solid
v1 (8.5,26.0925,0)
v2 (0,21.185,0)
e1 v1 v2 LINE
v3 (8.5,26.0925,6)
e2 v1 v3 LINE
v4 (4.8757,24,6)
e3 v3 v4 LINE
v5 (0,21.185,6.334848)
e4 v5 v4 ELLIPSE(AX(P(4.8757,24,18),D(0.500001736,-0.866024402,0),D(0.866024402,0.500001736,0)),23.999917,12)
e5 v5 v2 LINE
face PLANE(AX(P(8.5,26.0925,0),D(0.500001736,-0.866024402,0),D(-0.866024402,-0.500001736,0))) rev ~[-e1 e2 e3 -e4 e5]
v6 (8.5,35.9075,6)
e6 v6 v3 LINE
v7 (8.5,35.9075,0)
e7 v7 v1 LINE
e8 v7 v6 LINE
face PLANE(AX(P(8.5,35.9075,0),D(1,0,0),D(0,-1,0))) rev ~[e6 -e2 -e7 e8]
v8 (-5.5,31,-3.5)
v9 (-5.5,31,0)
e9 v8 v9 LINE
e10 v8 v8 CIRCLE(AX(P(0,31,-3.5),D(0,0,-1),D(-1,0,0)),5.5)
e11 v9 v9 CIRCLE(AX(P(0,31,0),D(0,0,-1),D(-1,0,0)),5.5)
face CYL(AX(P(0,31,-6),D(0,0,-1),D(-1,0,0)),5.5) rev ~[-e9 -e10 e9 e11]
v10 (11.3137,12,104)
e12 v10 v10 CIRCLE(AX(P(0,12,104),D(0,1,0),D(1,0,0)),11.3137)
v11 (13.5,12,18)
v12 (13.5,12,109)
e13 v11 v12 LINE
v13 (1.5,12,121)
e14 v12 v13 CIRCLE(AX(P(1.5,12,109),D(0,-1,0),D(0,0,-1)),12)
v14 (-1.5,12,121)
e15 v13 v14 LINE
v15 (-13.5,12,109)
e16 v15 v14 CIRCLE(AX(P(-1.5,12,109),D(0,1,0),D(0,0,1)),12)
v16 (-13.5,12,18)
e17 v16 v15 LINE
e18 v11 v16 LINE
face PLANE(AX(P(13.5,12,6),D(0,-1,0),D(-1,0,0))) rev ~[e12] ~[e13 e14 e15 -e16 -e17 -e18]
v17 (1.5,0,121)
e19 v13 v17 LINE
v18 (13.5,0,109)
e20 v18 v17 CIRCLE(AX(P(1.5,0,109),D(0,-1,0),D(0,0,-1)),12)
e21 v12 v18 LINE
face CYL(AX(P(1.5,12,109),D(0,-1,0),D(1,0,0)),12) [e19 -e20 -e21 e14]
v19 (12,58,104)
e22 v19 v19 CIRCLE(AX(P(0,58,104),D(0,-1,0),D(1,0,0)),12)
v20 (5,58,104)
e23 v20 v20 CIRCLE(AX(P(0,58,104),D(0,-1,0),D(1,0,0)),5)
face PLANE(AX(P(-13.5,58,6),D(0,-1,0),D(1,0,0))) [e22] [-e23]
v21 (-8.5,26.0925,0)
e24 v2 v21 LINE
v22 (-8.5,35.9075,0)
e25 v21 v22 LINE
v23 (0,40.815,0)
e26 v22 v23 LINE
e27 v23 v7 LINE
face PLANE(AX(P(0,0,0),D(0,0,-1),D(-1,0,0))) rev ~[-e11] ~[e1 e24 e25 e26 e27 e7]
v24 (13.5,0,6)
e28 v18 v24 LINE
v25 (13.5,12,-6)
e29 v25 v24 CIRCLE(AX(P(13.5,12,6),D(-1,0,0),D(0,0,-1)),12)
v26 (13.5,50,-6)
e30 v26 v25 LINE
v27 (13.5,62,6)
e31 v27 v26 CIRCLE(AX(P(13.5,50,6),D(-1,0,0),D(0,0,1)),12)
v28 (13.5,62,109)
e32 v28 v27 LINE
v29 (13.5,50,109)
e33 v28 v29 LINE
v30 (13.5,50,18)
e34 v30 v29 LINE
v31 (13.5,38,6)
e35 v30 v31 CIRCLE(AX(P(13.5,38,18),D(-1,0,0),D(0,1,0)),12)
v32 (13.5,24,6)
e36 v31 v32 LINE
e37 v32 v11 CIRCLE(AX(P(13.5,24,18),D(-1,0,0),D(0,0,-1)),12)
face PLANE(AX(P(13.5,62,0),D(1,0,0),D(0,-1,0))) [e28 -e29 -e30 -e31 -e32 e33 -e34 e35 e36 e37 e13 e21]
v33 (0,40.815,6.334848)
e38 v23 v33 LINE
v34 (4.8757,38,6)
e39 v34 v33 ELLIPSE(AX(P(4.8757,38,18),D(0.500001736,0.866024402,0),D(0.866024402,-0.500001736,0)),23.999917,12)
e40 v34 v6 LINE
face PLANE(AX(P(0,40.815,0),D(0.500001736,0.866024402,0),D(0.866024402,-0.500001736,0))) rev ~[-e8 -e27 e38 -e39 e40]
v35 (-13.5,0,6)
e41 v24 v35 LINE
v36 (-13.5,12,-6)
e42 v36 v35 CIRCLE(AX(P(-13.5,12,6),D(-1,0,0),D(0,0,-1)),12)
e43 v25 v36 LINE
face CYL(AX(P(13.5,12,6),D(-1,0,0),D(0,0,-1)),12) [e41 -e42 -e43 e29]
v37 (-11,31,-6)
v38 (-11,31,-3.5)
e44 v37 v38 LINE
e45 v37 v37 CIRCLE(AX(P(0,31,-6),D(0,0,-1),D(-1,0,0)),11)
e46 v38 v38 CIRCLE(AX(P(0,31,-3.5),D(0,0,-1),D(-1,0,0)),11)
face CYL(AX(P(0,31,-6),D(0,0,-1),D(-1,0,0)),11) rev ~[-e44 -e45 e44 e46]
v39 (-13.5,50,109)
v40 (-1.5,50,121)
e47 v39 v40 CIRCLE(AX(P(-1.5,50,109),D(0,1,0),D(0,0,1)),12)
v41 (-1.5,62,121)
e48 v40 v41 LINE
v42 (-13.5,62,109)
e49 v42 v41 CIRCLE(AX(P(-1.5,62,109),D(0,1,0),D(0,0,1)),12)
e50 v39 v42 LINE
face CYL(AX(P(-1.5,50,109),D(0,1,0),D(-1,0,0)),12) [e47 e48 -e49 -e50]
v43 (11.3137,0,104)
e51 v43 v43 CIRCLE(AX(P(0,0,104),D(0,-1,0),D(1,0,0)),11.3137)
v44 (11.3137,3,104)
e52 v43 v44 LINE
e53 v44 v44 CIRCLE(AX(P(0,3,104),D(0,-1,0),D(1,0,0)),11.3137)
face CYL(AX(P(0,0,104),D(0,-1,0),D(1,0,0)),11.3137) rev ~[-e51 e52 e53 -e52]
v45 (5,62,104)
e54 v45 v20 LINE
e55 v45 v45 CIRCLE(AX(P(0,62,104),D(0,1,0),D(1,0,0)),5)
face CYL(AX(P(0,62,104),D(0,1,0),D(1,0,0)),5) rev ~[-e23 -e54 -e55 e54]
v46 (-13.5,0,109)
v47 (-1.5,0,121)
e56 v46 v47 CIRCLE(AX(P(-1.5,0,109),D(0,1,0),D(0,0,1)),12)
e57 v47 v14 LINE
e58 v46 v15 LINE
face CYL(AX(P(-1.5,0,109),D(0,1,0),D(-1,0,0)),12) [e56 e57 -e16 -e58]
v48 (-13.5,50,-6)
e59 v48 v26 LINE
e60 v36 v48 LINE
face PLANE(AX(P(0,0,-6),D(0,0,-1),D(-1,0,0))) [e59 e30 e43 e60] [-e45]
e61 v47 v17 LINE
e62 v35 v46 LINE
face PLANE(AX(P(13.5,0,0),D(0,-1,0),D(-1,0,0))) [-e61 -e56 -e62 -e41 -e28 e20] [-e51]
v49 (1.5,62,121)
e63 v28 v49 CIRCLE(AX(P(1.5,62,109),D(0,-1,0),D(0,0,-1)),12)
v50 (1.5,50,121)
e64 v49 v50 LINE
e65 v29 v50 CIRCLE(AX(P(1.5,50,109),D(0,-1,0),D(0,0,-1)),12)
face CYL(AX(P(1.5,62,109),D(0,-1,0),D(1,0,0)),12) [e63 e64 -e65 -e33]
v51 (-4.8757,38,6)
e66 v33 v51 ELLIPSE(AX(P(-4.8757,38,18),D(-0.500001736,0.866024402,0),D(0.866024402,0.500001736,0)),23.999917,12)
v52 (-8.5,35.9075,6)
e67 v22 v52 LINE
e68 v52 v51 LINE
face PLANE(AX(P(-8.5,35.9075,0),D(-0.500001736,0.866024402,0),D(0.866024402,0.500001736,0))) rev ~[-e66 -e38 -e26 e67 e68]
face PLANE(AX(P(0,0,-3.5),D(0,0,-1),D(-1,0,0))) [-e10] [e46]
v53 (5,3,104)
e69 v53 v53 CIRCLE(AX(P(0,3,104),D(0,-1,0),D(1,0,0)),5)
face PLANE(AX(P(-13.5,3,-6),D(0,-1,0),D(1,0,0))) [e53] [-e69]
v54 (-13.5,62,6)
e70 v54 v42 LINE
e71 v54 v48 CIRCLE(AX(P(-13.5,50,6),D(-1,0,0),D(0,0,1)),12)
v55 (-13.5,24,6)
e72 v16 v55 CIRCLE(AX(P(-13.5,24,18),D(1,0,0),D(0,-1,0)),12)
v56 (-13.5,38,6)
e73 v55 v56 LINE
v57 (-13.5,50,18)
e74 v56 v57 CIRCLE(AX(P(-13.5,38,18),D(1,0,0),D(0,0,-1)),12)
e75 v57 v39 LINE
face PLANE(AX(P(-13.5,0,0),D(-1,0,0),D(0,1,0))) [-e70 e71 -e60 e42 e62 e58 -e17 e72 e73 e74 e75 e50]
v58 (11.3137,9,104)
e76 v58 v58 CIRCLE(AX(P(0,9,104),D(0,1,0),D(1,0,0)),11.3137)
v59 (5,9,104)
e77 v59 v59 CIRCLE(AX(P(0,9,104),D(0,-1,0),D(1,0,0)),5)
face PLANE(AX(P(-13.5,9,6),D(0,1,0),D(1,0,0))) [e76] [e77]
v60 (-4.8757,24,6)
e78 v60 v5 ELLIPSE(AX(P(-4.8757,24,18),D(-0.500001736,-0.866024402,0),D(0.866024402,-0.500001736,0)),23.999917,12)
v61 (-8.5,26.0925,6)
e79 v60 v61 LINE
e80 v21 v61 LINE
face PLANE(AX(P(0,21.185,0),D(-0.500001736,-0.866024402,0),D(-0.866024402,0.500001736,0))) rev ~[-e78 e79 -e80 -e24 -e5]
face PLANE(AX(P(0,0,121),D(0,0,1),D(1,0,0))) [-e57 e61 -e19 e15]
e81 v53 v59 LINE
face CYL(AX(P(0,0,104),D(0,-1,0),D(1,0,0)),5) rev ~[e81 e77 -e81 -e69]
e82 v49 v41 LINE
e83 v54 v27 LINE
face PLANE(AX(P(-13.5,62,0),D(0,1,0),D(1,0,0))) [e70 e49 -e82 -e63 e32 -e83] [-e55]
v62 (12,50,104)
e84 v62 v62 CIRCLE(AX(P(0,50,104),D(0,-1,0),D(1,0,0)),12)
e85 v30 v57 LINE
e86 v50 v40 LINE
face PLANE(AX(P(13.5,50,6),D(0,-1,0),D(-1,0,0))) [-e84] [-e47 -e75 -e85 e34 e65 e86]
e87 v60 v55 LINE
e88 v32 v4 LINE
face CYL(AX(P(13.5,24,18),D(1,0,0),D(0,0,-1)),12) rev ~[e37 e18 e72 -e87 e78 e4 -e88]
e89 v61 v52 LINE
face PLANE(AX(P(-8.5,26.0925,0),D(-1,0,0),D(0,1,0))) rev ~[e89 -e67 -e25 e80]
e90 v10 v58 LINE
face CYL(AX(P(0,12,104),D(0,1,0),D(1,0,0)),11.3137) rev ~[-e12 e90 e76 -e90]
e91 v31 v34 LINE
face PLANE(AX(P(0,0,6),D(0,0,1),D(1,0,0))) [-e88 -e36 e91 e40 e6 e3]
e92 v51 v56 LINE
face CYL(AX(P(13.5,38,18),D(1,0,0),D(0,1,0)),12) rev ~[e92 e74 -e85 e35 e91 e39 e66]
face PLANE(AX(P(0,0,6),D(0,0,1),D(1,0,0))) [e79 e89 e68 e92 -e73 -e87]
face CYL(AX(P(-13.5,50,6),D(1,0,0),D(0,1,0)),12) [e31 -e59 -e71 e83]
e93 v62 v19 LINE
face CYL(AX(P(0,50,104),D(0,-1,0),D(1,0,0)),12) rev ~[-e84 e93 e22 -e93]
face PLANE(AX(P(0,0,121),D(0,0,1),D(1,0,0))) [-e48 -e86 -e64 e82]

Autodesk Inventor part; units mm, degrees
ref_plane "YZ Plane" through (0, 0, 0) normal (1, 0, 0) x (0, 1, 0)
ref_plane "XZ Plane" through (0, 0, 0) normal (0, 1, 0) x (-1, 0, 0)
ref_plane "XY Plane" through (0, 0, 0) normal (0, 0, 1) x (1, 0, 0)
sketch "Boceto1" plane through (0, 0, 0) normal (0, 0, 1) x (1, 0, 0)
  line L0 (-13.5, 62) -> (13.5, 62)
  line L1 (13.5, 62) -> (13.5, 0)
  line L2 (13.5, 0) -> (-13.5, 0)
  line L3 (-13.5, 0) -> (-13.5, 62)
  line L4 (0, 0) -> (0, 62) construction
  line L5 (0, 40.815) -> (8.5, 35.9075)
  line L6 (8.5, 35.9075) -> (8.5, 26.0925)
  line L7 (8.5, 26.0925) -> (0, 21.185)
  line L8 (0, 21.185) -> (-8.5, 26.0925)
  line L9 (-8.5, 26.0925) -> (-8.5, 35.9075)
  line L10 (-8.5, 35.9075) -> (0, 40.815)
  line L11 (-8.5, 35.9075) -> (-13.5, 35.9075) construction
  line L12 (8.5, 35.9075) -> (13.5, 35.9075) construction
  point P0 (0, 31)
  dimension "d20" = 17
  dimension "d21" = 5
  dimension "d22" = 27
  dimension "d23" = 62
extrude "Extrusión1" add sketch "Boceto1" along normal blind 6
sketch "Boceto2" plane through (0, 0, 0) normal (0, 0, -1) x (-1, 0, 0)
  line L0 (-8.5, 26.0925) -> (-8.5, 35.9075) projected
  line L1 (-8.5, 35.9075) -> (0, 40.815) projected
  line L2 (0, 40.815) -> (8.5, 35.9075) projected
  line L3 (8.5, 35.9075) -> (8.5, 26.0925) projected
  line L4 (8.5, 26.0925) -> (0, 21.185) projected
  line L5 (0, 21.185) -> (-8.5, 26.0925) projected
  line L6 (13.5, 62) -> (-13.5, 62) projected
  line L7 (-13.5, 62) -> (-13.5, 0) projected
  line L8 (-13.5, 0) -> (13.5, 0) projected
  line L9 (13.5, 0) -> (13.5, 62) projected
  point P0 (0, 0)
extrude "Extrusión2" add sketch "Boceto2" along normal blind 6 contours L0 L1 L2 L3 L4 L5 | L9 L8 L7 L6
sketch "Boceto3" plane through (0, 0, -6) normal (0, 0, -1) x (-1, 0, 0)
  line L0 (0, 0) -> (0, 62) construction
  line L1 (-13.5, 62) -> (13.5, 62) projected
  circle A0 centre (0, 31) radius 5.5
  dimension "d18" = 11
extrude "Extrusión3" cut sketch "Boceto3" against normal up to next
sketch "Boceto5" plane through (0, 0, 6) normal (0, 0, 1) x (1, 0, 0)
  line L0 (-13.5, 0) -> (-13.5, 62) projected
  line L1 (13.5, 62) -> (13.5, 0) projected
  line L2 (-13.5, 0) -> (13.5, 0)
  line L3 (13.5, 0) -> (13.5, 12)
  line L4 (13.5, 12) -> (-13.5, 12)
  line L5 (-13.5, 12) -> (-13.5, 0)
  line L6 (13.5, 62) -> (-13.5, 62) projected
  line L7 (-13.5, 62) -> (13.5, 62)
  line L8 (13.5, 62) -> (13.5, 50)
  line L9 (13.5, 50) -> (-13.5, 50)
  line L10 (-13.5, 50) -> (-13.5, 62)
  line L11 (-17.3027, 31) -> (12.0796, 31) construction
  line L12 (-8.5, 26.0925) -> (-8.5, 35.9075) projected
  point P0 (0, 0)
  point P1 (-8.5, 31)
  dimension "d24" = 12
extrude "Extrusión4" add sketch "Boceto5" along normal blind 115 contours L0 L4 L1 L2 | L0 L6 L1 L9
sketch "Boceto9" plane through (-13.5, 0, -6) normal (0, -1, 0) x (1, 0, 0)
  circle A0 centre (13.5, 110) radius 5
  line L0 (0, 127) -> (27, 127) projected
  line L1 (13.5, 110) -> (13.5, 115)
  line L2 (13.5, 115) -> (13.5, 127)
  line L3 (0, 127) -> (27, 127) projected
  point P0 (13.5, 6)
  dimension "d25" = 10
  dimension "d32" = 12
extrude "Extrusión8" cut sketch "Boceto9" against normal up to surface (12 mm away)
sketch "Boceto10" plane through (0, 0, -6) normal (0, 0, -1) x (-1, 0, 0)
  circle A0 centre (0, 31) radius 11
  circle A1 centre (0, 31) radius 5.5 projected
  point P0 (0, 0)
  dimension "d29" = 22
extrude "Extrusión9" cut sketch "Boceto10" against normal blind 2.5
sketch "Boceto11" plane through (-13.5, 12, 6) normal (0, 1, 0) x (1, 0, 0)
  line L0 (21.5, -106) -> (5.5, -106) construction
  line L1 (5.5, -106) -> (5.5, -90) construction
  line L2 (5.5, -90) -> (21.5, -90) construction
  line L3 (21.5, -90) -> (21.5, -106) construction
  line L4 (5.5, -106) -> (21.5, -90) construction
  circle A0 centre (13.5, -98) radius 8 construction
  circle A1 centre (13.5, -98) radius 11.3137
  line L5 (27, 0) -> (27, -115) projected
  circle A2 centre (13.5, -98) radius 5 projected
  point P0 (13.5, 6)
  dimension "d45" = 16
extrude "Extrusión10" cut sketch "Boceto11" against normal blind 3 contours A1 | A2
sketch "Boceto12" plane through (-13.5, 0, -6) normal (0, -1, 0) x (1, 0, 0)
  circle A0 centre (13.5, 110) radius 11.3137 projected
  line L0 (0, 127) -> (0, 0) projected
  point P0 (13.5, 6)
extrude "Extrusión11" cut sketch "Boceto12" against normal blind 3
sketch "Boceto14" plane through (-13.5, 62, -6) normal (0, 1, 0) x (1, 0, 0)
  circle A0 centre (13.5, -110) radius 5 projected
  circle A1 centre (13.5, -110) radius 5
  point P0 (13.5, -6)
  dimension "d38" = 10
extrude "Extrusión12" cut sketch "Boceto14" against normal up to next
sketch "Boceto15" plane through (-13.5, 50, 6) normal (0, -1, 0) x (1, 0, 0)
  circle A0 centre (13.5, 98) radius 5 projected
  circle A1 centre (13.5, 98) radius 12
  point P0 (13.5, -6)
  dimension "d41" = 24
extrude "Extrusión13" cut sketch "Boceto15" against normal blind 8
fillet "Empalme4" radius 12 4 edges at (13.5, 56, 121) (-13.5, 56, 121) (13.5, 6, 121) (-13.5, 6, 121)
fillet "Empalme5" radius 12 2 edges at (0, 0, -6) (0, 62, -6)
fillet "Empalme6" radius 12 2 edges at (0, 12, 6) (0, 50, 6)
